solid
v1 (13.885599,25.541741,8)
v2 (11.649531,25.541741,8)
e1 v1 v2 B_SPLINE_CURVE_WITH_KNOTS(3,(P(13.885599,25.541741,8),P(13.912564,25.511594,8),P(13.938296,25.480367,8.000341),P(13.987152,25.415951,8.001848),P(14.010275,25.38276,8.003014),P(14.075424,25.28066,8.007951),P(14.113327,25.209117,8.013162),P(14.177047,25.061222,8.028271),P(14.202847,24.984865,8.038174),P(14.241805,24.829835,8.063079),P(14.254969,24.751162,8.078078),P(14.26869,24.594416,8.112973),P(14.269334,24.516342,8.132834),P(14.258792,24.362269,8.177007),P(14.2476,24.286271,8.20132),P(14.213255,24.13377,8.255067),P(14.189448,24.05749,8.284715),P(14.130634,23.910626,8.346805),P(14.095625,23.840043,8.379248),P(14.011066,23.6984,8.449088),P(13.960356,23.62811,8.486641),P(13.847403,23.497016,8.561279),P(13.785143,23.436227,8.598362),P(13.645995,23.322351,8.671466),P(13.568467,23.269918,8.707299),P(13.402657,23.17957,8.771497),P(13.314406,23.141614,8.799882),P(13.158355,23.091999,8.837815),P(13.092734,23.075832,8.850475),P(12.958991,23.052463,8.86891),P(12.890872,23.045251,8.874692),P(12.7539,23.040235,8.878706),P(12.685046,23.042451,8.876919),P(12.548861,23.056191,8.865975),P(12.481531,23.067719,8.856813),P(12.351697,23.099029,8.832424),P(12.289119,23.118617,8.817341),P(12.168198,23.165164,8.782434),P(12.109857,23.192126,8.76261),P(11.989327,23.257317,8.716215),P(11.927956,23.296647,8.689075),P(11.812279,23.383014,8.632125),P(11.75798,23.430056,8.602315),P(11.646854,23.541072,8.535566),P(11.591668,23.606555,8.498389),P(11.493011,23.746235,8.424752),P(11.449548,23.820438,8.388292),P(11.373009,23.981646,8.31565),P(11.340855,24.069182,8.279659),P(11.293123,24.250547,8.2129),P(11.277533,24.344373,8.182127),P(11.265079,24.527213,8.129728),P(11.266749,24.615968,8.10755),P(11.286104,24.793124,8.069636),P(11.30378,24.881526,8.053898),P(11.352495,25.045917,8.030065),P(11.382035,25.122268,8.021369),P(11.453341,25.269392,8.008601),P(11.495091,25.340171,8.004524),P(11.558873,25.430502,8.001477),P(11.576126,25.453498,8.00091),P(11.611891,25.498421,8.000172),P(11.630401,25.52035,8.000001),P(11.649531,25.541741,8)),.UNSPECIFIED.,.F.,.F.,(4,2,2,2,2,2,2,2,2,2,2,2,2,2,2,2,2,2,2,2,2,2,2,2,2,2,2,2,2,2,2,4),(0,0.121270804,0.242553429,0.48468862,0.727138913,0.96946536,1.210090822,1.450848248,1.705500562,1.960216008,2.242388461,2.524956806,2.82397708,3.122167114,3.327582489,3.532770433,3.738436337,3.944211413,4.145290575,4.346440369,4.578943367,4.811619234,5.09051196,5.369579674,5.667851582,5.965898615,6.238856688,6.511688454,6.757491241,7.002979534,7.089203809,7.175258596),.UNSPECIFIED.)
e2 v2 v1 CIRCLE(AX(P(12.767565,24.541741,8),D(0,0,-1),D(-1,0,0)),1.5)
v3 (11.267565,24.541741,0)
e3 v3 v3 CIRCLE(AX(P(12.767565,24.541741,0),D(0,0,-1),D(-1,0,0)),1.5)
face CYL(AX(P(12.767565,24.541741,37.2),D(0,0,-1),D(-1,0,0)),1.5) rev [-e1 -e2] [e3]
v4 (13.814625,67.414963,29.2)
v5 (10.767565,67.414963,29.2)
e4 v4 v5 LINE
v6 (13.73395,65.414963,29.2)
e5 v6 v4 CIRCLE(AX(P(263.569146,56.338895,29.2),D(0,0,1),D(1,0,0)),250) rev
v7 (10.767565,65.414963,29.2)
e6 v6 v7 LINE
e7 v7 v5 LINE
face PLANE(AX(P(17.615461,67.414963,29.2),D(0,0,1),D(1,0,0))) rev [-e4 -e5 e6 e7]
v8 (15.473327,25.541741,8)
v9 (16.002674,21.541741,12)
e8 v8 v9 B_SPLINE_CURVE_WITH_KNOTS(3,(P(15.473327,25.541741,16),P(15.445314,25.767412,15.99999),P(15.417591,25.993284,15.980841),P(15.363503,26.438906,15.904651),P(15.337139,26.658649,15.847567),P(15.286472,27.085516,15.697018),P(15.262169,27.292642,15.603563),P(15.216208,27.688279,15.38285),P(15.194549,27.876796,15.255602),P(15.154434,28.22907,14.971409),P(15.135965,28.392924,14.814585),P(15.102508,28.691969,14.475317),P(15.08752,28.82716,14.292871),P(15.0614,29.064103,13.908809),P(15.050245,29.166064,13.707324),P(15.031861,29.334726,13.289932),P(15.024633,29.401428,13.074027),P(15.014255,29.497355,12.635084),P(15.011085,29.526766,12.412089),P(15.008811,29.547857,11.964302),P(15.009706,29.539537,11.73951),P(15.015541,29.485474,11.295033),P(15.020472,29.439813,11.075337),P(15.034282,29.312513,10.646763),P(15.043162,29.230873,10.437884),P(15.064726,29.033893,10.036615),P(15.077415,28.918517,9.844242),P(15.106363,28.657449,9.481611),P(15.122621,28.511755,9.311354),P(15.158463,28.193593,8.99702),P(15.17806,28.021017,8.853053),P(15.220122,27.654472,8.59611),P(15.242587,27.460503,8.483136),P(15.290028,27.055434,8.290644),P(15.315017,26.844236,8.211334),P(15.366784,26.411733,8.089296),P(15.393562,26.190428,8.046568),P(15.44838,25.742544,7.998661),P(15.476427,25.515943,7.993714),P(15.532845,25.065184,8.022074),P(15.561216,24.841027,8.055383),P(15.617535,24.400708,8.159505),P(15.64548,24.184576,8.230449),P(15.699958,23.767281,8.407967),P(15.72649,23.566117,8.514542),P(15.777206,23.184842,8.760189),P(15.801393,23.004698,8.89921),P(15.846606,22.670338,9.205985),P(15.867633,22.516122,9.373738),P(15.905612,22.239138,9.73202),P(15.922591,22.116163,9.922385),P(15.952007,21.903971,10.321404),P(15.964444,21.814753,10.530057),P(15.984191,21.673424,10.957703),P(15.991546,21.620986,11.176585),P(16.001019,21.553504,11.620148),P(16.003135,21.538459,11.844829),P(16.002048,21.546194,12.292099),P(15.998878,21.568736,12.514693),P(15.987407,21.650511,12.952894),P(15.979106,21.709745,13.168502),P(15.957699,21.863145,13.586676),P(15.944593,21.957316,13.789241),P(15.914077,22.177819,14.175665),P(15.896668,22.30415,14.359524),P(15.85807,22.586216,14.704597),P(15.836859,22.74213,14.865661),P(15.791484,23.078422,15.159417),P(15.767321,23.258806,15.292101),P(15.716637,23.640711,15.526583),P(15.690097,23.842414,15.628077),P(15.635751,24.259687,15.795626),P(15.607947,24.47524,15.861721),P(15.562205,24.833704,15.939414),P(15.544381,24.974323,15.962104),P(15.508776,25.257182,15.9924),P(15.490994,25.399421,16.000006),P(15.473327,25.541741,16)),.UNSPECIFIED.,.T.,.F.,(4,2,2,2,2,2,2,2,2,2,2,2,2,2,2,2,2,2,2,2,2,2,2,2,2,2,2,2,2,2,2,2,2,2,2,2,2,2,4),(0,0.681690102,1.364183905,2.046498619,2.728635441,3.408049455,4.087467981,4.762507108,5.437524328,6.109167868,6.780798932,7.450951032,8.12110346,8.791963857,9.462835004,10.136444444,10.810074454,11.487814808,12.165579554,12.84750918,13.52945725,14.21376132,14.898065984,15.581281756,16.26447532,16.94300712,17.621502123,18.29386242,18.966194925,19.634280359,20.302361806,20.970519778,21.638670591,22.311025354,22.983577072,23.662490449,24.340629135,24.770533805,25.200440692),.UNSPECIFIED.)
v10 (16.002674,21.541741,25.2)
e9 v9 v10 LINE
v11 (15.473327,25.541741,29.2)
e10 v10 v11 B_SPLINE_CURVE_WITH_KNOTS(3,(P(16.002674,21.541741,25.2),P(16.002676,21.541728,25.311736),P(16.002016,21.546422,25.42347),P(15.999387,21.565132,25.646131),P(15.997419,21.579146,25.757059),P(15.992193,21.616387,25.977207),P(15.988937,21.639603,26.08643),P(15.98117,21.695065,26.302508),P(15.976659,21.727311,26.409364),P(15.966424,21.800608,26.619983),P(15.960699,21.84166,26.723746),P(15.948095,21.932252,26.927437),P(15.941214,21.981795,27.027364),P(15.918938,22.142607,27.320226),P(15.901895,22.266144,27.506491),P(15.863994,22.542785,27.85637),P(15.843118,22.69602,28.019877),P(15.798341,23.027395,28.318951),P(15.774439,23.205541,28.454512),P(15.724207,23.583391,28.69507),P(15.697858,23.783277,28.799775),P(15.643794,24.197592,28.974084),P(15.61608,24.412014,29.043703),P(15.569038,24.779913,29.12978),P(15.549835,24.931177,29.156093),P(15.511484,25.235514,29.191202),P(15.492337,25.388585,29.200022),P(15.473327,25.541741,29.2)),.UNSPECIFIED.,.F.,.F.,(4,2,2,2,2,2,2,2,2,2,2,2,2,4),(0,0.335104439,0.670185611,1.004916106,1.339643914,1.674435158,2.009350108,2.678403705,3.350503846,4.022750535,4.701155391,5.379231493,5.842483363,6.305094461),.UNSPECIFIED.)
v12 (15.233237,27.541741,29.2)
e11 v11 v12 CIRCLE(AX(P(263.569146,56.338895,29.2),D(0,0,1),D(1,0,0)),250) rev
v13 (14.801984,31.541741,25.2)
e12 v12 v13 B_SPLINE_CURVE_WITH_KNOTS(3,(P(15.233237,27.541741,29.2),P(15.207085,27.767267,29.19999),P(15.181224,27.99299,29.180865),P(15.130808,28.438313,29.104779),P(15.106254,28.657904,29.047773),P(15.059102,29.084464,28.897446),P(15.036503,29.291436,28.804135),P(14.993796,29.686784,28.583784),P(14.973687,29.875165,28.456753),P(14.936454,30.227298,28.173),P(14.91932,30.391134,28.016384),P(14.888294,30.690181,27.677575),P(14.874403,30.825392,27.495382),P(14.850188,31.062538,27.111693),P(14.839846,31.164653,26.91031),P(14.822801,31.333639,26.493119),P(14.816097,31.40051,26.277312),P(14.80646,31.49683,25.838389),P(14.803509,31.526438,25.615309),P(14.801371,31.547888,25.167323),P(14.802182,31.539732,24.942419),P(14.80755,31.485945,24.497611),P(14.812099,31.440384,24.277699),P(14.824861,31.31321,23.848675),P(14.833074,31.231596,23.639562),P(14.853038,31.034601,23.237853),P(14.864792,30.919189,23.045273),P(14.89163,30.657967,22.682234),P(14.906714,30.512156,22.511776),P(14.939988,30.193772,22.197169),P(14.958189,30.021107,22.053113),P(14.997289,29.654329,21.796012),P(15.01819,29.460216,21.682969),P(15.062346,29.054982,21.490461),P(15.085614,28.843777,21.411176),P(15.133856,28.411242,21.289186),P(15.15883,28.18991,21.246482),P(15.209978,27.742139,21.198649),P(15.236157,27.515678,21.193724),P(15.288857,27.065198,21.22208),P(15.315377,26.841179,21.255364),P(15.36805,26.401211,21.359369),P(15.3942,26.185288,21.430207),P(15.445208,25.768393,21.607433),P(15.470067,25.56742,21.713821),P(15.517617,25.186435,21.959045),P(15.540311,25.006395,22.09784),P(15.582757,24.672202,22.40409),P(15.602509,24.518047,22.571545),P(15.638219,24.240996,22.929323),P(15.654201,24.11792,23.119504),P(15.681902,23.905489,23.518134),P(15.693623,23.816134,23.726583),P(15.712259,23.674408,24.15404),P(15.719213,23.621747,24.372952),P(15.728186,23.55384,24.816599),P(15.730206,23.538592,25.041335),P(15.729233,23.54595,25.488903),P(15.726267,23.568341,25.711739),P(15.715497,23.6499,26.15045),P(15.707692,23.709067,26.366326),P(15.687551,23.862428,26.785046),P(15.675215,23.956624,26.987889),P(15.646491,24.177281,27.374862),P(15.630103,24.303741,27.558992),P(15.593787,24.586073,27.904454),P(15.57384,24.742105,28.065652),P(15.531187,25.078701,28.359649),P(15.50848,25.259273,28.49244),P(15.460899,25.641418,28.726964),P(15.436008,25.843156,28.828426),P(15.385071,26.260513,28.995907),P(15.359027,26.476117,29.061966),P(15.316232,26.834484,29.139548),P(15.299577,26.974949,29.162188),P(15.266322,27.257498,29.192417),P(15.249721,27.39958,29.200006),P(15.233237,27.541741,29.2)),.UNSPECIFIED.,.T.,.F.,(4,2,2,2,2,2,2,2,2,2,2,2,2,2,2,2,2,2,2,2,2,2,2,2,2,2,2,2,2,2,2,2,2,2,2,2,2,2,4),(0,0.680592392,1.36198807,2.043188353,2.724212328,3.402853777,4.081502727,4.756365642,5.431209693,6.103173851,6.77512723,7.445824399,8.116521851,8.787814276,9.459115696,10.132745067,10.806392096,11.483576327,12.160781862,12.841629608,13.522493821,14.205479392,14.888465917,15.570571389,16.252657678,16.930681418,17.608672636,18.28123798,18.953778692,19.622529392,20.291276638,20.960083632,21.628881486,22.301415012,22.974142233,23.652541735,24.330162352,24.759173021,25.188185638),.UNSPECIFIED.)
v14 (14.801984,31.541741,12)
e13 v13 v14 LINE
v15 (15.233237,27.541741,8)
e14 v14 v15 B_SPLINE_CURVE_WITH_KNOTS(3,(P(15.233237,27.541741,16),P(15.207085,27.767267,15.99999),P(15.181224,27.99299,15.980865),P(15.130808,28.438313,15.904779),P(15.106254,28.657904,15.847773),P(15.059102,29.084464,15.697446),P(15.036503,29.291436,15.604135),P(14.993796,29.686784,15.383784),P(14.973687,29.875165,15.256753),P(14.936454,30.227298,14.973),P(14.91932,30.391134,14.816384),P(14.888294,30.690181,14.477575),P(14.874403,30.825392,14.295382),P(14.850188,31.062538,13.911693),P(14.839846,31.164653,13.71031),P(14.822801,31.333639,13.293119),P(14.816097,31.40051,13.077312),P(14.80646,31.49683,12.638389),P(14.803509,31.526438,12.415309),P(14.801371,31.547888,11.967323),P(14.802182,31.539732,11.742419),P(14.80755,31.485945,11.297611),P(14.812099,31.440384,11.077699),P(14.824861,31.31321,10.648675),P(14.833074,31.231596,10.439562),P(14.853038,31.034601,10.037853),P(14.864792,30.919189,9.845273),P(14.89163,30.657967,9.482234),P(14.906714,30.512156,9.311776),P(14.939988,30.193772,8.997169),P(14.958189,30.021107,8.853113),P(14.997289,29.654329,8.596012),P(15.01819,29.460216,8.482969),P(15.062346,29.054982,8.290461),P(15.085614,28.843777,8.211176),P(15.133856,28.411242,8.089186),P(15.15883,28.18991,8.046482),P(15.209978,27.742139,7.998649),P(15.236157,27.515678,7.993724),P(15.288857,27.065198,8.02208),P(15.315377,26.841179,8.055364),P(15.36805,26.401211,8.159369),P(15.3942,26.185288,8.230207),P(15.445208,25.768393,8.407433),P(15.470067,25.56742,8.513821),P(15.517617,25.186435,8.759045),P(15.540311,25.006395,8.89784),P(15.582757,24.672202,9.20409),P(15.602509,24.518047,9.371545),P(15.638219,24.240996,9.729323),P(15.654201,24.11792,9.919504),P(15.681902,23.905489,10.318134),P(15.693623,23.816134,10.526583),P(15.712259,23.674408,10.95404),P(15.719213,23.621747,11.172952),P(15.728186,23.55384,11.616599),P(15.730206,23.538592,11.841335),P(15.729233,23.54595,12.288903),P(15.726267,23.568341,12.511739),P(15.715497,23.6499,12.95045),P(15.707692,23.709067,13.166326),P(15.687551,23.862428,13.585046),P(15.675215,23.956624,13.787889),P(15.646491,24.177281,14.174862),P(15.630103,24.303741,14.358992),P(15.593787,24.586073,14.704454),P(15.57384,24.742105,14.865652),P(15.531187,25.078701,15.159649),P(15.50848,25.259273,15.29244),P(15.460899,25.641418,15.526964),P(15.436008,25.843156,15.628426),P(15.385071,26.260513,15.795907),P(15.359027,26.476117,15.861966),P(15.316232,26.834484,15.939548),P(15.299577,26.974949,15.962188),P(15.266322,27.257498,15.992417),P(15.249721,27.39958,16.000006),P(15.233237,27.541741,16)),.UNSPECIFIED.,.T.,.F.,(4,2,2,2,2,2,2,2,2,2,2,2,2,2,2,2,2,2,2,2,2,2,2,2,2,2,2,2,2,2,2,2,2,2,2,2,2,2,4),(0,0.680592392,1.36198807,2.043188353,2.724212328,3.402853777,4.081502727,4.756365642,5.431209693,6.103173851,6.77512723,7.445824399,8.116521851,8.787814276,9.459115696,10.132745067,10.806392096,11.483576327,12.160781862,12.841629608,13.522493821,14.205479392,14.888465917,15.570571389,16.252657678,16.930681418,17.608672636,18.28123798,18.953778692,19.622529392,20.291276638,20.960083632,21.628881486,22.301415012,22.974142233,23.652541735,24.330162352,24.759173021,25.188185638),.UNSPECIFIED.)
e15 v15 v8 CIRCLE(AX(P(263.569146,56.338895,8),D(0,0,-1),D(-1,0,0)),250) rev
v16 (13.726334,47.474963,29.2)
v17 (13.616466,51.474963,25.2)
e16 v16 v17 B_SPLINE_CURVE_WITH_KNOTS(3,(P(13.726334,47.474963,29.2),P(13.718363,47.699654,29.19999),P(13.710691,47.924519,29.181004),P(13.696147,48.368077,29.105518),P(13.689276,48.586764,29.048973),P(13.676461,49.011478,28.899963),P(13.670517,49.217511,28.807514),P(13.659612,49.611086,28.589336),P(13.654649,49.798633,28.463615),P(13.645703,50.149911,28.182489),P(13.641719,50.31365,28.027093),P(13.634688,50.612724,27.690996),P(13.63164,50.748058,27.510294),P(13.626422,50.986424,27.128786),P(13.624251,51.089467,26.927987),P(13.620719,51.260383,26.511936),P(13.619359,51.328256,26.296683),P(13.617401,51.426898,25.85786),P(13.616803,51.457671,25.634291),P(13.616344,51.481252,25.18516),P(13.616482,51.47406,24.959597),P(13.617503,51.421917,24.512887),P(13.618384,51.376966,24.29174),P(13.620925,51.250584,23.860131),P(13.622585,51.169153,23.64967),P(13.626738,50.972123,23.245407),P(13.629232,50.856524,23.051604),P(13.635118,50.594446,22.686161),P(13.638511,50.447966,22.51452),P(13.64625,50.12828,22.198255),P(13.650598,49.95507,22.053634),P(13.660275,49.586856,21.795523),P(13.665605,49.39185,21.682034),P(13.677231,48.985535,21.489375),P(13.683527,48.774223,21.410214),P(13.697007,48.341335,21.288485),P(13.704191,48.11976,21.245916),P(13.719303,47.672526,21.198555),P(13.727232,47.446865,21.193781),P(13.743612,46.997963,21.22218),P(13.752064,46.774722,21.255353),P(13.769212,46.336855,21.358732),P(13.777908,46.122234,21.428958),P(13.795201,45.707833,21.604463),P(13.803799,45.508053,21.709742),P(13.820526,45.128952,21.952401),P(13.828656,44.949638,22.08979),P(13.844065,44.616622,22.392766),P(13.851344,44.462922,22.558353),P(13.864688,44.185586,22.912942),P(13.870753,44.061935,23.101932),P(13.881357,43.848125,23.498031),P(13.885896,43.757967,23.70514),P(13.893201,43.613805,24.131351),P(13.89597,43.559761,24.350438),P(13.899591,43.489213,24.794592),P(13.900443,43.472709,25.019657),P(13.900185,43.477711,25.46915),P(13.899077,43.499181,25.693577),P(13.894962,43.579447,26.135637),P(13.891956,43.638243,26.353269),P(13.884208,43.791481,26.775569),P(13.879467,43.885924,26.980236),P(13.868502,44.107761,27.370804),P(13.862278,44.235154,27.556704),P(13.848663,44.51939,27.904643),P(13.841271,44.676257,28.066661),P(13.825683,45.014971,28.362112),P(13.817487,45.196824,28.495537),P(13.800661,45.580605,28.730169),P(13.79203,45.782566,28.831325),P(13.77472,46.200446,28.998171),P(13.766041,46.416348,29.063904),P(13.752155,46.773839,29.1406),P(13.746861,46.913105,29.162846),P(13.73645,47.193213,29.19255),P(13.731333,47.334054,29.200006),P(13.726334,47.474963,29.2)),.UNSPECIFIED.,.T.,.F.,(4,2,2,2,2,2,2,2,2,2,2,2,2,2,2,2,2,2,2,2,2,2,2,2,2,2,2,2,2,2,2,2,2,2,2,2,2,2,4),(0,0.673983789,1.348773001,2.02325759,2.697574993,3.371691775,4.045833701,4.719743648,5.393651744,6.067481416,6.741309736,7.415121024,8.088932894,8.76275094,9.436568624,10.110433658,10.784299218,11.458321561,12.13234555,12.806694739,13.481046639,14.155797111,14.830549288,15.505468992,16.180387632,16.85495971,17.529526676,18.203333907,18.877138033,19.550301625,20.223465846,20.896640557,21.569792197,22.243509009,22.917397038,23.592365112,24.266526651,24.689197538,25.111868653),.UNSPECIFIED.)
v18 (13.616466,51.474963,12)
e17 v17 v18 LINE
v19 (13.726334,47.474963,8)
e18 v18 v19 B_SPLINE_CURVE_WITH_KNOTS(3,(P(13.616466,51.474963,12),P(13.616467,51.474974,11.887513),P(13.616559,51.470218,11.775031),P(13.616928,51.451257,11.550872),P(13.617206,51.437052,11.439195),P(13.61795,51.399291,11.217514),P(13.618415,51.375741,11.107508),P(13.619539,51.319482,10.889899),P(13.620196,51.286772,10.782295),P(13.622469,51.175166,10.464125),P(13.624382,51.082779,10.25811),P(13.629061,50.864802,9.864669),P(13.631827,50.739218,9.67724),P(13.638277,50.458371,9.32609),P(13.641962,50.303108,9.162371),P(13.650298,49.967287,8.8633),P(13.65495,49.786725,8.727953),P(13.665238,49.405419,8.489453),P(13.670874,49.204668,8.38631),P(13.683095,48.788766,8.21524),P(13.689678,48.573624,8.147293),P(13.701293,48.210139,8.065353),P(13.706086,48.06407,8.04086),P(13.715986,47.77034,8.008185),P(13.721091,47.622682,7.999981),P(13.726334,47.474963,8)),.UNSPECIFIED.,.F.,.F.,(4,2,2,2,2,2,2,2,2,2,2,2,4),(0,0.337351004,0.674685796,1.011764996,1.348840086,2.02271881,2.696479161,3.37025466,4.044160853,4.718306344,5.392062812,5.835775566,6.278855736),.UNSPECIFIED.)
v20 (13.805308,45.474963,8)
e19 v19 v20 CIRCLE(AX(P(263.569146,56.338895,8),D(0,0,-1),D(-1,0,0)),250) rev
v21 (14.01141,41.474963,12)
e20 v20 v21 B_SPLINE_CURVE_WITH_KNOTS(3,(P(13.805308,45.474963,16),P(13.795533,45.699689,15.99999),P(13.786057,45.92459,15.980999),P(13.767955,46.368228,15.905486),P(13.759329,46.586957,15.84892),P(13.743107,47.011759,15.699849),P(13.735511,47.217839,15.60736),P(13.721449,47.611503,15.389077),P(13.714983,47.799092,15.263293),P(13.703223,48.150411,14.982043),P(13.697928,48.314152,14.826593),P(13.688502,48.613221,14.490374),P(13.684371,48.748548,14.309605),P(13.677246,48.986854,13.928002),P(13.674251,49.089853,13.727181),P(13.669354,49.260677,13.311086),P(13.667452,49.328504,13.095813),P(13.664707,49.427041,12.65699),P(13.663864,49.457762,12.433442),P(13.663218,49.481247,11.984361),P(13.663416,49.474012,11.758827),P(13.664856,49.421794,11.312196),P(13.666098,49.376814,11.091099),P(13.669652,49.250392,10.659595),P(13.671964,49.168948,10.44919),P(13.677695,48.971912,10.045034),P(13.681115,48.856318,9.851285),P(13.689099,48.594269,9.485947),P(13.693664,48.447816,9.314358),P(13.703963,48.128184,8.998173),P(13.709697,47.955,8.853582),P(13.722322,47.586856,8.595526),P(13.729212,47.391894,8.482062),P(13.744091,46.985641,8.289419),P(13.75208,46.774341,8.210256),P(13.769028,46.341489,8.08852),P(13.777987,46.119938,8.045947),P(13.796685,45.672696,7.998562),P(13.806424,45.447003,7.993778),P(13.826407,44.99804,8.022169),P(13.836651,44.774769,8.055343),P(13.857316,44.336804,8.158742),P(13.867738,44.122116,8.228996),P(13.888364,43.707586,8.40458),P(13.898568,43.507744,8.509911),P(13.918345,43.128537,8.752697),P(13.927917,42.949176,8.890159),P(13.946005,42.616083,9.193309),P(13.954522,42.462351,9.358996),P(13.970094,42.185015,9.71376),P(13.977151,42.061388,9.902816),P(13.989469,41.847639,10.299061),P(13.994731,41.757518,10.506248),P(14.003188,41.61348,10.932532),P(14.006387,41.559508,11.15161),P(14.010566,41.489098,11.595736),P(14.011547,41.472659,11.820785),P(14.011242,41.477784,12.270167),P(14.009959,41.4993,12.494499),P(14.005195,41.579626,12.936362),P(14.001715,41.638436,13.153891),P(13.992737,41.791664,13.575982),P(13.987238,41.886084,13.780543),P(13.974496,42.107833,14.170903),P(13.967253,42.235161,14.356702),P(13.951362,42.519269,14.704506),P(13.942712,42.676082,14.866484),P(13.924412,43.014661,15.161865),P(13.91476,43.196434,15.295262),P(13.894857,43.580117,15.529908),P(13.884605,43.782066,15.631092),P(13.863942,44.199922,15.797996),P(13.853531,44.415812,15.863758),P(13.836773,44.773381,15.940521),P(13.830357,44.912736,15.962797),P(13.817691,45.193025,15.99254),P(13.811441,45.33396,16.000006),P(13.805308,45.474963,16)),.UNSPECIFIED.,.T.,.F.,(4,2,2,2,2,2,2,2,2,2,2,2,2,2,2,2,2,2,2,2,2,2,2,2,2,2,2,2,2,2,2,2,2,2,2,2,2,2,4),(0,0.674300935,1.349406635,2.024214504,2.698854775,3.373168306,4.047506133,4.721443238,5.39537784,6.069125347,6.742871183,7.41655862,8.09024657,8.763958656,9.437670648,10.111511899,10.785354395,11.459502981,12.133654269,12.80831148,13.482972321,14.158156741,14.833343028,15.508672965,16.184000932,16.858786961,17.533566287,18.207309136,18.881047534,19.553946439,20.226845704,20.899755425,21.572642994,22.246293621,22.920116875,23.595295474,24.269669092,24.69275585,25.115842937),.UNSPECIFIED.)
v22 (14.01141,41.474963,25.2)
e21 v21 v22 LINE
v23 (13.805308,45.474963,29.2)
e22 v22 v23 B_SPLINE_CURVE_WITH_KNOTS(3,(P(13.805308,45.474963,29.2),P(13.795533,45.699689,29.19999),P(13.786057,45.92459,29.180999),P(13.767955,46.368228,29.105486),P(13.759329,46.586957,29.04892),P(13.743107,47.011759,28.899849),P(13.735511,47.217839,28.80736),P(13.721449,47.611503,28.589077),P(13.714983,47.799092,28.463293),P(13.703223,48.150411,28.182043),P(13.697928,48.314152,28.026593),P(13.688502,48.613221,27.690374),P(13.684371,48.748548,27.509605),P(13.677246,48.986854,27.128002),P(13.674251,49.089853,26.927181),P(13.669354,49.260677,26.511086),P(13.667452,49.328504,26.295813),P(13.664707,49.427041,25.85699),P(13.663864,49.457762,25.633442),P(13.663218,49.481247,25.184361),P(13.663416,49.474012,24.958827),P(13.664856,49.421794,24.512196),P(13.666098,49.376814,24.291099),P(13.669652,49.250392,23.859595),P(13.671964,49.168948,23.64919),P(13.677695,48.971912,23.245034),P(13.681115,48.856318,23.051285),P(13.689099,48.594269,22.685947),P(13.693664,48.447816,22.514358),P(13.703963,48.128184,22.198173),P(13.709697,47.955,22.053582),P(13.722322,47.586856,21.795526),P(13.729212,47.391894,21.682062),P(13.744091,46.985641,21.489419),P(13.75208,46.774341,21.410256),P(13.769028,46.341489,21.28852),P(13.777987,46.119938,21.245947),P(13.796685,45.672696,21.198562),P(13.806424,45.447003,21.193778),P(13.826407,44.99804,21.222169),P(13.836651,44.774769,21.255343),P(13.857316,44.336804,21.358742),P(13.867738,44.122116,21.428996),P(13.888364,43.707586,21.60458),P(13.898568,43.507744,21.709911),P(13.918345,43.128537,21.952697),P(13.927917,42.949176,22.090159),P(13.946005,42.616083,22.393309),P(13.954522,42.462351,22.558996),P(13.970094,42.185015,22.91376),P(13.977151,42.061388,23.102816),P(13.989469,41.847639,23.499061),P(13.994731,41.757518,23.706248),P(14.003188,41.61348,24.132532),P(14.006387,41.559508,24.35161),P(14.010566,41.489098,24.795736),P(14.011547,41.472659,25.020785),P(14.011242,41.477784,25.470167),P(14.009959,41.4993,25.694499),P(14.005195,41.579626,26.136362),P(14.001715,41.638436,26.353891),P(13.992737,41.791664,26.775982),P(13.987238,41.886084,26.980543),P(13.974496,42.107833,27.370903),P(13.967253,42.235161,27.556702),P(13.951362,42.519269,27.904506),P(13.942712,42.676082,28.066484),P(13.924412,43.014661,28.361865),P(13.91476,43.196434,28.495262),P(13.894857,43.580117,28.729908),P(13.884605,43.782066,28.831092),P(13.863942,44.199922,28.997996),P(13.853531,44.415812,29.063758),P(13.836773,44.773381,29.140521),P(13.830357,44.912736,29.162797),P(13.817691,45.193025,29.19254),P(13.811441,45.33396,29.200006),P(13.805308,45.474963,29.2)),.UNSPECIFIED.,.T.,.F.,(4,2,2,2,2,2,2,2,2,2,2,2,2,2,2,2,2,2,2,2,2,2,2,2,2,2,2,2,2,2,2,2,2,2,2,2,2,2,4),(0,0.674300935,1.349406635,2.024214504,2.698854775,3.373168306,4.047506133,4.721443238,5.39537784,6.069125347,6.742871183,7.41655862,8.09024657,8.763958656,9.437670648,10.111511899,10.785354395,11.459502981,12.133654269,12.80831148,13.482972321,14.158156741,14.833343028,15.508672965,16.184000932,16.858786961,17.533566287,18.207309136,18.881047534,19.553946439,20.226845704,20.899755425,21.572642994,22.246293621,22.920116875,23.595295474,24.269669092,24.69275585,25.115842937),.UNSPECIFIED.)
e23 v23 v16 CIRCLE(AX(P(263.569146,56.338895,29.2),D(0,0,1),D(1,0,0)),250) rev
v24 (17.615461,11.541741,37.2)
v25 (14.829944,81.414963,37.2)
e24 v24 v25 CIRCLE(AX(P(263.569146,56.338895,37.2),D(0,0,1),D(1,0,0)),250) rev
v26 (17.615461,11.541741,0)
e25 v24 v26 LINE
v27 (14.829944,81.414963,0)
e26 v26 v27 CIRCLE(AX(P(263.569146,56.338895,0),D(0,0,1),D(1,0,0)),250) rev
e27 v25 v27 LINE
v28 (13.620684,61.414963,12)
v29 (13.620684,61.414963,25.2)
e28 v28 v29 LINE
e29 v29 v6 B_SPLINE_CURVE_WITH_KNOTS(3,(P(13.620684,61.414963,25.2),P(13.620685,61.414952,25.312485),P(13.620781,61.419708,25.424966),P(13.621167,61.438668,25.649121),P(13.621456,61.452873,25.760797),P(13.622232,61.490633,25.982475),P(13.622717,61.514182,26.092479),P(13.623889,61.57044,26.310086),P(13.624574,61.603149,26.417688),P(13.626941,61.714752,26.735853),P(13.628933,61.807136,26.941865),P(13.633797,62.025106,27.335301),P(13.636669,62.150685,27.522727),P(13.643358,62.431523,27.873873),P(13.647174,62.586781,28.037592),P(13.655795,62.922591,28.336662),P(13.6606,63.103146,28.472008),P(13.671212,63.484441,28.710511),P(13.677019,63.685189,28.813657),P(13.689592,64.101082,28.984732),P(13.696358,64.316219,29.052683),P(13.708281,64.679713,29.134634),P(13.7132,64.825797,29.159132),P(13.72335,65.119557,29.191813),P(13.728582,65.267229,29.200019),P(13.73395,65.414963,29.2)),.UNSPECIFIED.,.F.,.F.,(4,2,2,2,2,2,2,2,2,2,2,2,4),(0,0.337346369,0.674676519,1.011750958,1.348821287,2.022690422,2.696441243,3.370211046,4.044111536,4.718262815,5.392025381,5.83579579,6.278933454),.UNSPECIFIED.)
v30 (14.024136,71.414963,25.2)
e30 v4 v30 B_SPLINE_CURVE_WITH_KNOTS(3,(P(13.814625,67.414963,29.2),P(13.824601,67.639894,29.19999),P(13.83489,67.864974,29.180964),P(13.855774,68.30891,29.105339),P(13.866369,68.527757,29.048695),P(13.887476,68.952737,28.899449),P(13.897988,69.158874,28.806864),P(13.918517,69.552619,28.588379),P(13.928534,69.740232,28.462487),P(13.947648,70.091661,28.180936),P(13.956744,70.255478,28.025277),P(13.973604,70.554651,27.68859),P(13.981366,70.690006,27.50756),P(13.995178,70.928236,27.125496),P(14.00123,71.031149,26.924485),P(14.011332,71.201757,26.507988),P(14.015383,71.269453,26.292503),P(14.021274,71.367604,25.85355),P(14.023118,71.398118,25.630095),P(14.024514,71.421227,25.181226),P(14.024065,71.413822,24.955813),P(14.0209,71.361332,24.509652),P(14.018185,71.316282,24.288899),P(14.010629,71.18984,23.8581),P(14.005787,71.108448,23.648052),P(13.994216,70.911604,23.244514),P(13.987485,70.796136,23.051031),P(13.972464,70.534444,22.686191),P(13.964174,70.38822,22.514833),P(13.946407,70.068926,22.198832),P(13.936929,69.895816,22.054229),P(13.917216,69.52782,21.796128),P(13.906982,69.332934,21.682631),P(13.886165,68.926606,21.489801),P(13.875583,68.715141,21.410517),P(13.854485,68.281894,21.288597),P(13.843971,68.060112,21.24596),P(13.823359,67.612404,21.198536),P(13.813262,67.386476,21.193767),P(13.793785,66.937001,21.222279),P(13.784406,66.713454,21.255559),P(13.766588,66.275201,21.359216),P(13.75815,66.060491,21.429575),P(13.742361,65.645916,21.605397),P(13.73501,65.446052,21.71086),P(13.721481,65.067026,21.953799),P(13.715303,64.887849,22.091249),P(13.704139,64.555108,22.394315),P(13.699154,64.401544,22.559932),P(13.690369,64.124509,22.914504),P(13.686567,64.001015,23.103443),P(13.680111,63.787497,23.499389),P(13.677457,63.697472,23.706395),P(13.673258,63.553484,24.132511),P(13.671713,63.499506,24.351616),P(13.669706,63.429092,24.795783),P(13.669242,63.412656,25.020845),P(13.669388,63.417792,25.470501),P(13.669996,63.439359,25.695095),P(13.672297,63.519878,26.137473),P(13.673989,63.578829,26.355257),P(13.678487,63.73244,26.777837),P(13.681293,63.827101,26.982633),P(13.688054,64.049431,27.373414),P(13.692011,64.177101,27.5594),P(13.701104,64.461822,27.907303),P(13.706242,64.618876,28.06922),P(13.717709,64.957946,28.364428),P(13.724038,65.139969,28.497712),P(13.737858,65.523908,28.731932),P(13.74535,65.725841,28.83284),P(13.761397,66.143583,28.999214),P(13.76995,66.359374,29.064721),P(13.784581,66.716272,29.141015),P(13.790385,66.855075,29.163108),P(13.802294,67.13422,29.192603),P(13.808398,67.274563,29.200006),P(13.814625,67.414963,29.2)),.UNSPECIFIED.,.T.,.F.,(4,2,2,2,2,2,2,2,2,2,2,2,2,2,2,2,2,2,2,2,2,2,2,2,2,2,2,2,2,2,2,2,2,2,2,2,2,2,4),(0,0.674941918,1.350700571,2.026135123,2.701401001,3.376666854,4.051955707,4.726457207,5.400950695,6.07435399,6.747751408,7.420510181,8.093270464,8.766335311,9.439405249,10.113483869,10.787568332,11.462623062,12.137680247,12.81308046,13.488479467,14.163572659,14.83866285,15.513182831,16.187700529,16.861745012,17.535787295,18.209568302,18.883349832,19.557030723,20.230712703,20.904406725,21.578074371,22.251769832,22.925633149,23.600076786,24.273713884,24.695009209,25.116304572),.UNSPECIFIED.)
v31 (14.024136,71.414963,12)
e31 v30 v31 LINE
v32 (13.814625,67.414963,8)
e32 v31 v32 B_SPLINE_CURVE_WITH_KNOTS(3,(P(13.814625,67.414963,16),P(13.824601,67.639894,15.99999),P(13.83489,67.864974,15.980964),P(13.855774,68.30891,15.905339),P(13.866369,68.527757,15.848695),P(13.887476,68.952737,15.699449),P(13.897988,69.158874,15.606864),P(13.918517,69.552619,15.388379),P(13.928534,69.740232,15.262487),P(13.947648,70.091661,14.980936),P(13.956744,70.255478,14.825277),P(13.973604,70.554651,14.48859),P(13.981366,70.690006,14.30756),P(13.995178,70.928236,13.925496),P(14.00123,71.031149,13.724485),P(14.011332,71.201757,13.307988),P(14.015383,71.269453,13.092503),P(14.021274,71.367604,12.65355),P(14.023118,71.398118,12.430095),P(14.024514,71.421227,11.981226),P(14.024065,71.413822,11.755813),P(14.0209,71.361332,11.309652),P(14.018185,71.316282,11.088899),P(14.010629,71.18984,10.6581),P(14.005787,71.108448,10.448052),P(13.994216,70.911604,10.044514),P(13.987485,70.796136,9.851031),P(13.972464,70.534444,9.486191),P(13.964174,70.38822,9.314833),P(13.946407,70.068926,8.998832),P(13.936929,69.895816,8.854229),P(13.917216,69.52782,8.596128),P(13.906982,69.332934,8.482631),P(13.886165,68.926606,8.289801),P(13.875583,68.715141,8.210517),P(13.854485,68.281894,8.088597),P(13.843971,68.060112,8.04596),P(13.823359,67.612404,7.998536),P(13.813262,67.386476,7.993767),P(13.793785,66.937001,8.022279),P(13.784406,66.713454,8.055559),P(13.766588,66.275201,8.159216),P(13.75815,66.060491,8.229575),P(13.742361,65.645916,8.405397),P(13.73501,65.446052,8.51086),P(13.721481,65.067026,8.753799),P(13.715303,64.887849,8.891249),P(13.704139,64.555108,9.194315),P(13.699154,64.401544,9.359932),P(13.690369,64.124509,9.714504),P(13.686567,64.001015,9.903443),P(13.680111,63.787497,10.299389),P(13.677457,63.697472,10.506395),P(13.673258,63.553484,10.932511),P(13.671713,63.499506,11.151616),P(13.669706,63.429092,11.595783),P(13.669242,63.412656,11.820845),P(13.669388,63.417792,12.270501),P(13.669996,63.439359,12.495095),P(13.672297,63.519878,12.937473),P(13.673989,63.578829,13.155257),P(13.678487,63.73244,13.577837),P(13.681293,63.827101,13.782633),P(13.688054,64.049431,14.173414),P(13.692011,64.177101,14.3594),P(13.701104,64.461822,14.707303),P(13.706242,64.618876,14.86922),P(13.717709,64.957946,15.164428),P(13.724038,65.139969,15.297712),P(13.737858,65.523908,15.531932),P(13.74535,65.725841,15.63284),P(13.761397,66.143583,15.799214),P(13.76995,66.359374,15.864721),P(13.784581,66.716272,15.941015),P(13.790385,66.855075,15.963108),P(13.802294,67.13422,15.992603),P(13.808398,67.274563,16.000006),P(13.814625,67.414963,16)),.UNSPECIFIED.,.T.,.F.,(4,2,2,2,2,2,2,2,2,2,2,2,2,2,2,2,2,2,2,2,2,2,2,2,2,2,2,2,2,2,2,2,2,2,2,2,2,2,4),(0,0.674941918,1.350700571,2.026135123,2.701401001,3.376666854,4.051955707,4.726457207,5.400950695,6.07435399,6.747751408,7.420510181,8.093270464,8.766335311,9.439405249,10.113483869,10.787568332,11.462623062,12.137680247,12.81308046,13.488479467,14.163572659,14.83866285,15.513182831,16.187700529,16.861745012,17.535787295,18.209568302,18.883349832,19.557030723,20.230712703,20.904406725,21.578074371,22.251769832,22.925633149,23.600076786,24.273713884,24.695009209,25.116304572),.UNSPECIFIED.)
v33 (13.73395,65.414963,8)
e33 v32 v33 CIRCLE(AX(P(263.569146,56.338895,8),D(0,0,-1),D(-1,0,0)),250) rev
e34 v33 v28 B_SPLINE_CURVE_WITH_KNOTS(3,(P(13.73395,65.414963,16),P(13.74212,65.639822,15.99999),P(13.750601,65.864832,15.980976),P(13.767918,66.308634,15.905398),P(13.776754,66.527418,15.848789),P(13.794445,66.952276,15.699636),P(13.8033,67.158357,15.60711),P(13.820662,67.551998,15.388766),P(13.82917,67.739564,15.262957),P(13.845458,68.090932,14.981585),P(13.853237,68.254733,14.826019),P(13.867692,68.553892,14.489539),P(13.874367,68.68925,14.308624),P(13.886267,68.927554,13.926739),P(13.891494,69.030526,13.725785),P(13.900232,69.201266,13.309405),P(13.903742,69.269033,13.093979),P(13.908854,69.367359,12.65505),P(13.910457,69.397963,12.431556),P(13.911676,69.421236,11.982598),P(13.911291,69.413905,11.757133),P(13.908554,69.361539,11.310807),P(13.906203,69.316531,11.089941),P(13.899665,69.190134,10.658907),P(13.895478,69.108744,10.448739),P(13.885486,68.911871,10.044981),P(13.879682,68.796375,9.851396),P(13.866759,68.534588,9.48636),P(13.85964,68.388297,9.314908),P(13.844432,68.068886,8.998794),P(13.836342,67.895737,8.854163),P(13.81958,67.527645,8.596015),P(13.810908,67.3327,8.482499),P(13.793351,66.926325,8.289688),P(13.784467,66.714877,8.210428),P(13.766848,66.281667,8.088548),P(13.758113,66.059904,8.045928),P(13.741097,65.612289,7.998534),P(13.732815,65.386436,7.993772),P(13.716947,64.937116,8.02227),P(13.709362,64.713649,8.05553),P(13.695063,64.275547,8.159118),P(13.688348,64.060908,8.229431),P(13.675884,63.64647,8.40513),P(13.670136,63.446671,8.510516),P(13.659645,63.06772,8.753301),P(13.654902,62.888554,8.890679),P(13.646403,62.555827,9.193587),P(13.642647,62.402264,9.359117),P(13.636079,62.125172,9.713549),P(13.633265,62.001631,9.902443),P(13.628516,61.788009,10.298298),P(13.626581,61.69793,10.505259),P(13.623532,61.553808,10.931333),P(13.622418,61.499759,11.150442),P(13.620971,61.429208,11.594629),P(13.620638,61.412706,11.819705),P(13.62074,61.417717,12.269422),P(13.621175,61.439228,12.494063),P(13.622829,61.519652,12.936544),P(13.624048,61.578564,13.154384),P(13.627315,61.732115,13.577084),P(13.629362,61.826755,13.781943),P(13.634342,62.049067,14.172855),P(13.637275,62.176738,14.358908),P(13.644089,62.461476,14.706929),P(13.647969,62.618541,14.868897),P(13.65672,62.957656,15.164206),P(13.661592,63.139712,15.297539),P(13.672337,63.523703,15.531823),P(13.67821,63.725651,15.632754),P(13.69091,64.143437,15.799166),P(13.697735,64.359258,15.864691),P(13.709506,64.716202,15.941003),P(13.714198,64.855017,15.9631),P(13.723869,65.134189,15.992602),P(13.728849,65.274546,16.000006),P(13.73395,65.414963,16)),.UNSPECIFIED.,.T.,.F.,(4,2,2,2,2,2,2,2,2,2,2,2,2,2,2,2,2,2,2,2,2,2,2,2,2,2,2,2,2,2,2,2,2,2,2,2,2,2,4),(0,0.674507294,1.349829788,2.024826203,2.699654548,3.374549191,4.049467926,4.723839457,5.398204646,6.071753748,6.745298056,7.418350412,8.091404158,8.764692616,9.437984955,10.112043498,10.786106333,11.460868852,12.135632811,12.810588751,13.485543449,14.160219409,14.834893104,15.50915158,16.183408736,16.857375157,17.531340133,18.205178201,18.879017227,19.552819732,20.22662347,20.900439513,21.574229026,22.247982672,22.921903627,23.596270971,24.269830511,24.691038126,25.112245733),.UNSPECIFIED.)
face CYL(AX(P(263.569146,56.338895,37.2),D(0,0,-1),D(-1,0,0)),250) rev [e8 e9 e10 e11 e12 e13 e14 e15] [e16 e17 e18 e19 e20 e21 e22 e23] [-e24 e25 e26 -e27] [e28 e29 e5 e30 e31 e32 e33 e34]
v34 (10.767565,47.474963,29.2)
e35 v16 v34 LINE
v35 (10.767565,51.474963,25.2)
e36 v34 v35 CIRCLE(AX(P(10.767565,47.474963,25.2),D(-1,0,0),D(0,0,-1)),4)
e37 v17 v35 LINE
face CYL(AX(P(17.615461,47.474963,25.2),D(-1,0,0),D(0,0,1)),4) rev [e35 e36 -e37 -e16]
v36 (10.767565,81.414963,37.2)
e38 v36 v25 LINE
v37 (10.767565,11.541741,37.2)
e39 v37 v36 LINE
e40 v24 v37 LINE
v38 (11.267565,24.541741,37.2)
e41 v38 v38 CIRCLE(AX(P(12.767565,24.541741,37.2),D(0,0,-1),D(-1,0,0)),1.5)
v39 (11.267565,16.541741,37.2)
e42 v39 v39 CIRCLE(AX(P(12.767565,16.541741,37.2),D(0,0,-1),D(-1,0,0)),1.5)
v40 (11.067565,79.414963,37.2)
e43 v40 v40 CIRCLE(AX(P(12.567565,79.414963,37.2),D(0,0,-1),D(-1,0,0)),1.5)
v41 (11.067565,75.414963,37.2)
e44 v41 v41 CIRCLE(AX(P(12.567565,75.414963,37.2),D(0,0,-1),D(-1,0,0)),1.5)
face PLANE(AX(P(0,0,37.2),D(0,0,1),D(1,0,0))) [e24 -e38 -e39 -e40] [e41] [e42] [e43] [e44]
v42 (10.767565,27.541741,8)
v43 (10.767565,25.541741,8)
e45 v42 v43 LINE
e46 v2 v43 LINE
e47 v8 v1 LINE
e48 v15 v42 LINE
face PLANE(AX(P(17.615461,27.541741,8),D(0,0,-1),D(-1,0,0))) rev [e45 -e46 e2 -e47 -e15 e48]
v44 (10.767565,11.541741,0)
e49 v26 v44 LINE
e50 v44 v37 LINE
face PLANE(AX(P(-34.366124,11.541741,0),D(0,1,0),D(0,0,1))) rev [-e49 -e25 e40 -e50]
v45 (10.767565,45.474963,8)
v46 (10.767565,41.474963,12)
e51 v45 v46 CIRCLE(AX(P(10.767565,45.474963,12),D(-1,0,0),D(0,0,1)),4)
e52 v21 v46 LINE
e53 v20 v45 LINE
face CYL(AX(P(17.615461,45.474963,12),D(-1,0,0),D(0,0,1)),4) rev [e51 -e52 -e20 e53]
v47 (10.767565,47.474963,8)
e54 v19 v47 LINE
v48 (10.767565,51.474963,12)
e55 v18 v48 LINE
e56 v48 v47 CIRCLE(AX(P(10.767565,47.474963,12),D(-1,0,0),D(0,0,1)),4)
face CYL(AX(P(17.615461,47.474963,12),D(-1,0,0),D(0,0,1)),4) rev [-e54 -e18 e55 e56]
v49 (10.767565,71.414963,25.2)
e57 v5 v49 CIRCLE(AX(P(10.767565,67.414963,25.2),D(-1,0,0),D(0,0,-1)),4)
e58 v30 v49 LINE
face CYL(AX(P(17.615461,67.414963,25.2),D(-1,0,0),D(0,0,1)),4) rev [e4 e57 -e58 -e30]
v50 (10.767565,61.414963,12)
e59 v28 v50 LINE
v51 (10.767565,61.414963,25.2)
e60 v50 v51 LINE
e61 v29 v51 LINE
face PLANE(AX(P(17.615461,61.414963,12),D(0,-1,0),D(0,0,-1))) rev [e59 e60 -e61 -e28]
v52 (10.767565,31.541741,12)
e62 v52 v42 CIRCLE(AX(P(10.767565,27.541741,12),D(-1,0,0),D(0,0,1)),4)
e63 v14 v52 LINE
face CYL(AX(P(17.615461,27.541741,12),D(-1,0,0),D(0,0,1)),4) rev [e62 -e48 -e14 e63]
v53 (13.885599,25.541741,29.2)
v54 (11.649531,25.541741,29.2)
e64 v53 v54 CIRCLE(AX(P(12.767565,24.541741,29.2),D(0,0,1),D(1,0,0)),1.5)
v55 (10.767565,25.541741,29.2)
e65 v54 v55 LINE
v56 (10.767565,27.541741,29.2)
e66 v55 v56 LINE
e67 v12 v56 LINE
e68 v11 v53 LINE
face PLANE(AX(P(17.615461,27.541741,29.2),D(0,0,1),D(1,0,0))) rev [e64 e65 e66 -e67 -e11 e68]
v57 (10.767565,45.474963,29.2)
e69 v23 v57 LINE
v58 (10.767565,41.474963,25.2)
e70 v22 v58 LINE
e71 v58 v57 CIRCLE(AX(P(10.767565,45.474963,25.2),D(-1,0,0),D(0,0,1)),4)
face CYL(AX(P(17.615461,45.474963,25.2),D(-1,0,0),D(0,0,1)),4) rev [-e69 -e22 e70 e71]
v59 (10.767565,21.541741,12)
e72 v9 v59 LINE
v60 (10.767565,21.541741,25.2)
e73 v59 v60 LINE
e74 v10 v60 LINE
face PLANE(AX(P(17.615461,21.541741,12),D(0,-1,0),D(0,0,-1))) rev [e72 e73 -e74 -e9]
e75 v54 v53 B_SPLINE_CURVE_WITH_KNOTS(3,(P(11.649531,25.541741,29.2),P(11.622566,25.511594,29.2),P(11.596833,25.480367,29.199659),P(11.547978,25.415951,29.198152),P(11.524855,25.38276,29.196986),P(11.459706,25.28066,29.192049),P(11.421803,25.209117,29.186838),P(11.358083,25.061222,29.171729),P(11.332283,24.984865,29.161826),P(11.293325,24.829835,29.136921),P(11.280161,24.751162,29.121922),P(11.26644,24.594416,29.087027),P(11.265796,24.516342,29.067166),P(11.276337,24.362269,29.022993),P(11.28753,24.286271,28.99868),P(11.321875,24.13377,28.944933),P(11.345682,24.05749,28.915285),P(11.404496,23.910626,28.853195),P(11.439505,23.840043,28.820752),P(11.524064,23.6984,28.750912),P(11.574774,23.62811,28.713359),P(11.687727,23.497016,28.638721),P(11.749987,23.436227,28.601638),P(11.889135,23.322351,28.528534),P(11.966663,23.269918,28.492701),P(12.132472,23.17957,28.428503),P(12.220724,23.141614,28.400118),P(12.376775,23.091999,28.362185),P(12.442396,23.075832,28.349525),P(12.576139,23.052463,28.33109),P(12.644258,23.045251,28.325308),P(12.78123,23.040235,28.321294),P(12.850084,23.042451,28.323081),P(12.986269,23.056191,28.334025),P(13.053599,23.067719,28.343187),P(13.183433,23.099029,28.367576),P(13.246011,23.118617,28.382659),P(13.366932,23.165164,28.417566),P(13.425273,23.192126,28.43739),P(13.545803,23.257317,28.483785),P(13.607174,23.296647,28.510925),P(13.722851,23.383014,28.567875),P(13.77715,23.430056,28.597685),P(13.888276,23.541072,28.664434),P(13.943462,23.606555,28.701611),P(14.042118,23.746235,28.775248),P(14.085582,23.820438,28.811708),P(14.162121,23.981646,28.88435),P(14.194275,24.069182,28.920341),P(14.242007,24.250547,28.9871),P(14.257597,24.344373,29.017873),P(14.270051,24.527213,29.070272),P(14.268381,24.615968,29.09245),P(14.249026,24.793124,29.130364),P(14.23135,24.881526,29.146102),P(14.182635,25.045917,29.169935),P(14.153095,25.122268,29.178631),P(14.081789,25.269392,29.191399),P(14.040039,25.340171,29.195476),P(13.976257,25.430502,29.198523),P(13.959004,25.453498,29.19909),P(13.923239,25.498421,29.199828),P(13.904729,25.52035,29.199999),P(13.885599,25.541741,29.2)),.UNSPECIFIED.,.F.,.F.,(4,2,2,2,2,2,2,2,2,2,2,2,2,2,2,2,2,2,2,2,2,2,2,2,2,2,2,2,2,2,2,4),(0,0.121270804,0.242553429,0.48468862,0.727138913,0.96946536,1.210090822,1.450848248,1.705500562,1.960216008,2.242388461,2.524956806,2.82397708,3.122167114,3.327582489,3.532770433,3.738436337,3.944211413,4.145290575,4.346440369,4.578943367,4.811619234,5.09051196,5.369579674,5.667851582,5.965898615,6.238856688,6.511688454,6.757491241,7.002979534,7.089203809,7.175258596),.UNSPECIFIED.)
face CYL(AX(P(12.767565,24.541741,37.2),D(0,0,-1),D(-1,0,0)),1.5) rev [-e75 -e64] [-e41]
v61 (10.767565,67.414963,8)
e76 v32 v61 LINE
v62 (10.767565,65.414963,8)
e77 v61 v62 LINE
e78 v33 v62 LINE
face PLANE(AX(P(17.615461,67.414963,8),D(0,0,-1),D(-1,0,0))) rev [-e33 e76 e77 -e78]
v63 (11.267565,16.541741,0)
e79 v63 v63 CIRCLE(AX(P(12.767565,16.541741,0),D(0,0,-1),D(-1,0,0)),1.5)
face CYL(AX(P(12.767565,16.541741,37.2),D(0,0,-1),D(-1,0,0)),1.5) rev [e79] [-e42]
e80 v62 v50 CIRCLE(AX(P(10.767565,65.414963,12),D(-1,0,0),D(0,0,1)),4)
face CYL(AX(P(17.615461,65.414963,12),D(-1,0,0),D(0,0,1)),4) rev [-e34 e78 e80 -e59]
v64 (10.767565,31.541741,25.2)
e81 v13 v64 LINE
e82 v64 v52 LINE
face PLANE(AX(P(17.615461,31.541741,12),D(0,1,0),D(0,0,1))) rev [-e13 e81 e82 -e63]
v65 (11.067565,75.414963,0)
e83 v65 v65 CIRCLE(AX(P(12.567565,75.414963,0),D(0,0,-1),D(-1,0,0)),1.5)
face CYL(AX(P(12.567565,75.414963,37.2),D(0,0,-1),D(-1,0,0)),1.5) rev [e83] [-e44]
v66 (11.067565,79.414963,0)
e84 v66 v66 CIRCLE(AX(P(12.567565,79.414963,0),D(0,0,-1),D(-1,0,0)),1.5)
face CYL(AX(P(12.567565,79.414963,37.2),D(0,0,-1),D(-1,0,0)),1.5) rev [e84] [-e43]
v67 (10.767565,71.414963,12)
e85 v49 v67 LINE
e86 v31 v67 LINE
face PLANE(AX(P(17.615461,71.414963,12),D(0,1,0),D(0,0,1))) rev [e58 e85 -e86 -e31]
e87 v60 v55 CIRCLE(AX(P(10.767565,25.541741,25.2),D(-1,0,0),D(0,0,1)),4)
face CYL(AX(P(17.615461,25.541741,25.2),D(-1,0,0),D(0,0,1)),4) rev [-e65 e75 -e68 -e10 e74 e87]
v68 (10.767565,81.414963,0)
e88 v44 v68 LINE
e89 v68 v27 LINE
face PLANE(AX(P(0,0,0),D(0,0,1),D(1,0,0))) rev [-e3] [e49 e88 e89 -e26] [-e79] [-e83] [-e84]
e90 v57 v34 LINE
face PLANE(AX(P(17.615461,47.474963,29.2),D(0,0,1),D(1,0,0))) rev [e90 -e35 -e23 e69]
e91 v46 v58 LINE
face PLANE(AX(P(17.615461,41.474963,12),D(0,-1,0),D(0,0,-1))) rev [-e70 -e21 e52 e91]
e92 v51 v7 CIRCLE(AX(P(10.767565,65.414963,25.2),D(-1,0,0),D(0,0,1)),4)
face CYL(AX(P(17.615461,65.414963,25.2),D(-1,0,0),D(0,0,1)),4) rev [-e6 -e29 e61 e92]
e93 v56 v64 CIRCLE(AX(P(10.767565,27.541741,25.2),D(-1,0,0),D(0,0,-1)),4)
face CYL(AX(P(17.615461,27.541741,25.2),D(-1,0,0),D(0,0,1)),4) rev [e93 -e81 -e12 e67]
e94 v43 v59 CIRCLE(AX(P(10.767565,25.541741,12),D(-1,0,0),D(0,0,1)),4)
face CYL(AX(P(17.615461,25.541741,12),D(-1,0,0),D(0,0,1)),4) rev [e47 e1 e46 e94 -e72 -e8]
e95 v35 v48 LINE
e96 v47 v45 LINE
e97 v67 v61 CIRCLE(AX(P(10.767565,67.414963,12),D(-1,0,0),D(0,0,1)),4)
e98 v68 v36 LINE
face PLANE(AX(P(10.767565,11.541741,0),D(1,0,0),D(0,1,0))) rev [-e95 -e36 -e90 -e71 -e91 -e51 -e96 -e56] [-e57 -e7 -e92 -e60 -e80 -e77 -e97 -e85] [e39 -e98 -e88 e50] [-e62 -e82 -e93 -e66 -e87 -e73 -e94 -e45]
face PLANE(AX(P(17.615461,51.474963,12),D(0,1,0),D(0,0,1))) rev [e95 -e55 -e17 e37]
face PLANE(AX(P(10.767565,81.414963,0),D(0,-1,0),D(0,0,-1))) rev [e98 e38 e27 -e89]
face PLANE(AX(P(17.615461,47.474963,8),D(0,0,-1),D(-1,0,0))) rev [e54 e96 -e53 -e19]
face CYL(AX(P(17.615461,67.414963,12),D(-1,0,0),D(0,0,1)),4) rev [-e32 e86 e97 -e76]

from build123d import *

# Parameters (mm, degrees)
RESSALTO_EXTRUS_O1_DEPTH = 37.2
FILETE3_R                = 10
FILETE4_R                = 10
ESBO_O3_W                = 64.493903811
ESBO_O3_H                = 22.028162523
CORTE_EXTRUS_O2_DEPTH    = 126.622328301
ESBO_O4_W                = 56.697594262
ESBO_O4_H                = 123.119514717
CORTE_EXTRUS_O6_DEPTH    = 126.622328159
ESBO_O7_W                = 25.761955102
ESBO_O7_H                = 34.830585193
CORTE_EXTRUS_O7_DEPTH    = 125.245881598
CORTE_EXTRUS_O8_DEPTH    = 90.772656751
ESBO_O9_R                = 1.5
CORTE_EXTRUS_O9_DEPTH    = 92.227960203


with BuildPart() as part:
    # Esboço1 → Ressalto-extrusão1 (new body)
    with BuildSketch(Plane.XY):
        with BuildLine():
            ThreePointArc((-10, 0), (0, -10), (10, 0))
            Line((10, 0), (20, 0))
            ThreePointArc((20, 0), (14.071698091, 40.495175194), (14.829943665, 81.414963086))
            ThreePointArc((14.829943665, 81.414963086), (11.193742071, 116.066691762), (-16.576524471, 95.024435265))
            Line((-16.576524471, 95.024435265), (-16.487894969, 94.437265709))
            Line((-16.487894969, 94.437265709), (-16.369382775, 93.652123615))
            ThreePointArc((-16.369382775, 93.652123615), (-13.756795166, 46.654405302), (-20, 0))
            Line((-20, 0), (-10, 0))
        make_face()
    extrude(amount=RESSALTO_EXTRUS_O1_DEPTH)

    # Filete3
    # the kernel refuses this fillet: 10 mm, written as the material it takes off along each edge
    with BuildSketch(Plane(origin=(20, 0, -29.463728433), x_dir=(-0.20232831186330175, 0.9793177493635794, 0), z_dir=(0, 0, 1))) as filete3_piece_1:
        with BuildLine():
            CenterArc((12.021201201, 9.997221658), FILETE3_R, 181.169168083, 87.480189)
            Line((2.023283119, 9.793177494), (1.823324757, 9.78909661))
            ThreePointArc((1.823324757, 9.78909661), (0.815778009, 4.937054409), (-0.19586355, 0.040465662))
            Line((-0.19586355, 0.040465662), (0.004714197, -0.199944433))
            ThreePointArc((0.004714197, -0.199944433), (5.892745687, -0.130541448), (11.780777177, -0.199944433))
            Line((11.780777177, -0.199944433), (11.785491373, 0))
        make_face()
    extrude(amount=96.127456867, mode=Mode.SUBTRACT)
    with BuildSketch(Plane(origin=(-20, 0, -29.463728433), x_dir=(1, 0, 0), z_dir=(0, 0, 1))) as filete3_piece_2:
        with BuildLine():
            CenterArc((12.222685959, 9.749854723), FILETE3_R, 169.67749742, 87.480189)
            Line((2.384538574, 11.541740887), (2.187775626, 11.57757861))
            ThreePointArc((2.187775626, 11.57757861), (1.06442773, 5.797282674), (-0.194855317, 0.045071116))
            Line((-0.194855317, 0.045071116), (0, -0.2))
            ThreePointArc((0, -0.2), (5, -0.2), (9.955546281, -0.194997094))
            Line((9.955546281, -0.194997094), (10, 0))
        make_face()
    extrude(amount=96.127456867, mode=Mode.SUBTRACT)

    # Filete4
    filete4_edges = [part.edges().sort_by_distance(p)[0] for p in [
        (10, 0, 18.6),
        (-10, 0, 18.6),
    ]]
    fillet(filete4_edges, radius=FILETE4_R)

    # Esboço3 → Corte-extrusão2 (cut, through all)
    with BuildSketch(Plane.XY.offset(37.2)):
        with Locations((-2.119172362, 0.527659626)):
            Rectangle(ESBO_O3_W, ESBO_O3_H)
    extrude(amount=-CORTE_EXTRUS_O2_DEPTH, mode=Mode.SUBTRACT)

    # Esboço4 → Corte-extrusão6 (cut, through all)
    with BuildSketch(Plane.XY.offset(37.2)):
        with Locations((-17.581232159, 73.101498246)):
            Rectangle(ESBO_O4_W, ESBO_O4_H)
    extrude(amount=-CORTE_EXTRUS_O6_DEPTH, mode=Mode.SUBTRACT)

    # Esboço7 → Corte-extrusão7 (cut, through all)
    with BuildSketch(Plane.XY.offset(37.2)):
        with Locations((23.648542523, 98.830255682)):
            Rectangle(ESBO_O7_W, ESBO_O7_H)
    extrude(amount=-CORTE_EXTRUS_O7_DEPTH, mode=Mode.SUBTRACT)

    # Esboço8 → Corte-extrusão8 (cut, through all)
    with BuildSketch(Plane.ZY.offset(-10.767564972)):
        with BuildLine():
            Line((12, 71.414963086), (25.2, 71.414963086))
            ThreePointArc((25.2, 71.414963086), (28.028427125, 70.243390211), (29.2, 67.414963086))
            Line((29.2, 67.414963086), (29.2, 65.414963086))
            ThreePointArc((29.2, 65.414963086), (28.028427125, 62.586535961), (25.2, 61.414963086))
            Line((25.2, 61.414963086), (12, 61.414963086))
            ThreePointArc((12, 61.414963086), (9.171572875, 62.586535961), (8, 65.414963086))
            Line((8, 65.414963086), (8, 67.414963086))
            ThreePointArc((8, 67.414963086), (9.171572875, 70.243390211), (12, 71.414963086))
        make_face()
        with BuildLine():
            Line((12, 51.474963086), (25.2, 51.474963086))
            ThreePointArc((25.2, 51.474963086), (28.028427125, 50.303390211), (29.2, 47.474963086))
            Line((29.2, 47.474963086), (29.2, 45.474963086))
            ThreePointArc((29.2, 45.474963086), (28.028427125, 42.646535961), (25.2, 41.474963086))
            Line((25.2, 41.474963086), (12, 41.474963086))
            ThreePointArc((12, 41.474963086), (9.171572875, 42.646535961), (8, 45.474963086))
            Line((8, 45.474963086), (8, 47.474963086))
            ThreePointArc((8, 47.474963086), (9.171572875, 50.303390211), (12, 51.474963086))
        make_face()
        with BuildLine():
            Line((12, 31.541740887), (25.2, 31.541740887))
            ThreePointArc((25.2, 31.541740887), (28.028427125, 30.370168012), (29.2, 27.541740887))
            Line((29.2, 27.541740887), (29.2, 25.541740887))
            ThreePointArc((29.2, 25.541740887), (28.028427125, 22.713313762), (25.2, 21.541740887))
            Line((25.2, 21.541740887), (12, 21.541740887))
            ThreePointArc((12, 21.541740887), (9.171572875, 22.713313762), (8, 25.541740887))
            Line((8, 25.541740887), (8, 27.541740887))
            ThreePointArc((8, 27.541740887), (9.171572875, 30.370168012), (12, 31.541740887))
        make_face()
    extrude(amount=-CORTE_EXTRUS_O8_DEPTH, mode=Mode.SUBTRACT)

    # Esboço9 → Corte-extrusão9 (cut, through all)
    with BuildSketch(Plane(origin=(0, 0, 0), x_dir=(-1, 0, 0), z_dir=(0, 0, -1))):
        with Locations((-12.767564972, 16.541740887)):
            Circle(ESBO_O9_R)
        with Locations((-12.767564972, 24.541740887)):
            Circle(ESBO_O9_R)
        with Locations((-12.567564972, 79.414963086)):
            Circle(ESBO_O9_R)
        with Locations((-12.567564972, 75.414963086)):
            Circle(ESBO_O9_R)
    extrude(amount=-CORTE_EXTRUS_O9_DEPTH, mode=Mode.SUBTRACT)


solid = part.part
